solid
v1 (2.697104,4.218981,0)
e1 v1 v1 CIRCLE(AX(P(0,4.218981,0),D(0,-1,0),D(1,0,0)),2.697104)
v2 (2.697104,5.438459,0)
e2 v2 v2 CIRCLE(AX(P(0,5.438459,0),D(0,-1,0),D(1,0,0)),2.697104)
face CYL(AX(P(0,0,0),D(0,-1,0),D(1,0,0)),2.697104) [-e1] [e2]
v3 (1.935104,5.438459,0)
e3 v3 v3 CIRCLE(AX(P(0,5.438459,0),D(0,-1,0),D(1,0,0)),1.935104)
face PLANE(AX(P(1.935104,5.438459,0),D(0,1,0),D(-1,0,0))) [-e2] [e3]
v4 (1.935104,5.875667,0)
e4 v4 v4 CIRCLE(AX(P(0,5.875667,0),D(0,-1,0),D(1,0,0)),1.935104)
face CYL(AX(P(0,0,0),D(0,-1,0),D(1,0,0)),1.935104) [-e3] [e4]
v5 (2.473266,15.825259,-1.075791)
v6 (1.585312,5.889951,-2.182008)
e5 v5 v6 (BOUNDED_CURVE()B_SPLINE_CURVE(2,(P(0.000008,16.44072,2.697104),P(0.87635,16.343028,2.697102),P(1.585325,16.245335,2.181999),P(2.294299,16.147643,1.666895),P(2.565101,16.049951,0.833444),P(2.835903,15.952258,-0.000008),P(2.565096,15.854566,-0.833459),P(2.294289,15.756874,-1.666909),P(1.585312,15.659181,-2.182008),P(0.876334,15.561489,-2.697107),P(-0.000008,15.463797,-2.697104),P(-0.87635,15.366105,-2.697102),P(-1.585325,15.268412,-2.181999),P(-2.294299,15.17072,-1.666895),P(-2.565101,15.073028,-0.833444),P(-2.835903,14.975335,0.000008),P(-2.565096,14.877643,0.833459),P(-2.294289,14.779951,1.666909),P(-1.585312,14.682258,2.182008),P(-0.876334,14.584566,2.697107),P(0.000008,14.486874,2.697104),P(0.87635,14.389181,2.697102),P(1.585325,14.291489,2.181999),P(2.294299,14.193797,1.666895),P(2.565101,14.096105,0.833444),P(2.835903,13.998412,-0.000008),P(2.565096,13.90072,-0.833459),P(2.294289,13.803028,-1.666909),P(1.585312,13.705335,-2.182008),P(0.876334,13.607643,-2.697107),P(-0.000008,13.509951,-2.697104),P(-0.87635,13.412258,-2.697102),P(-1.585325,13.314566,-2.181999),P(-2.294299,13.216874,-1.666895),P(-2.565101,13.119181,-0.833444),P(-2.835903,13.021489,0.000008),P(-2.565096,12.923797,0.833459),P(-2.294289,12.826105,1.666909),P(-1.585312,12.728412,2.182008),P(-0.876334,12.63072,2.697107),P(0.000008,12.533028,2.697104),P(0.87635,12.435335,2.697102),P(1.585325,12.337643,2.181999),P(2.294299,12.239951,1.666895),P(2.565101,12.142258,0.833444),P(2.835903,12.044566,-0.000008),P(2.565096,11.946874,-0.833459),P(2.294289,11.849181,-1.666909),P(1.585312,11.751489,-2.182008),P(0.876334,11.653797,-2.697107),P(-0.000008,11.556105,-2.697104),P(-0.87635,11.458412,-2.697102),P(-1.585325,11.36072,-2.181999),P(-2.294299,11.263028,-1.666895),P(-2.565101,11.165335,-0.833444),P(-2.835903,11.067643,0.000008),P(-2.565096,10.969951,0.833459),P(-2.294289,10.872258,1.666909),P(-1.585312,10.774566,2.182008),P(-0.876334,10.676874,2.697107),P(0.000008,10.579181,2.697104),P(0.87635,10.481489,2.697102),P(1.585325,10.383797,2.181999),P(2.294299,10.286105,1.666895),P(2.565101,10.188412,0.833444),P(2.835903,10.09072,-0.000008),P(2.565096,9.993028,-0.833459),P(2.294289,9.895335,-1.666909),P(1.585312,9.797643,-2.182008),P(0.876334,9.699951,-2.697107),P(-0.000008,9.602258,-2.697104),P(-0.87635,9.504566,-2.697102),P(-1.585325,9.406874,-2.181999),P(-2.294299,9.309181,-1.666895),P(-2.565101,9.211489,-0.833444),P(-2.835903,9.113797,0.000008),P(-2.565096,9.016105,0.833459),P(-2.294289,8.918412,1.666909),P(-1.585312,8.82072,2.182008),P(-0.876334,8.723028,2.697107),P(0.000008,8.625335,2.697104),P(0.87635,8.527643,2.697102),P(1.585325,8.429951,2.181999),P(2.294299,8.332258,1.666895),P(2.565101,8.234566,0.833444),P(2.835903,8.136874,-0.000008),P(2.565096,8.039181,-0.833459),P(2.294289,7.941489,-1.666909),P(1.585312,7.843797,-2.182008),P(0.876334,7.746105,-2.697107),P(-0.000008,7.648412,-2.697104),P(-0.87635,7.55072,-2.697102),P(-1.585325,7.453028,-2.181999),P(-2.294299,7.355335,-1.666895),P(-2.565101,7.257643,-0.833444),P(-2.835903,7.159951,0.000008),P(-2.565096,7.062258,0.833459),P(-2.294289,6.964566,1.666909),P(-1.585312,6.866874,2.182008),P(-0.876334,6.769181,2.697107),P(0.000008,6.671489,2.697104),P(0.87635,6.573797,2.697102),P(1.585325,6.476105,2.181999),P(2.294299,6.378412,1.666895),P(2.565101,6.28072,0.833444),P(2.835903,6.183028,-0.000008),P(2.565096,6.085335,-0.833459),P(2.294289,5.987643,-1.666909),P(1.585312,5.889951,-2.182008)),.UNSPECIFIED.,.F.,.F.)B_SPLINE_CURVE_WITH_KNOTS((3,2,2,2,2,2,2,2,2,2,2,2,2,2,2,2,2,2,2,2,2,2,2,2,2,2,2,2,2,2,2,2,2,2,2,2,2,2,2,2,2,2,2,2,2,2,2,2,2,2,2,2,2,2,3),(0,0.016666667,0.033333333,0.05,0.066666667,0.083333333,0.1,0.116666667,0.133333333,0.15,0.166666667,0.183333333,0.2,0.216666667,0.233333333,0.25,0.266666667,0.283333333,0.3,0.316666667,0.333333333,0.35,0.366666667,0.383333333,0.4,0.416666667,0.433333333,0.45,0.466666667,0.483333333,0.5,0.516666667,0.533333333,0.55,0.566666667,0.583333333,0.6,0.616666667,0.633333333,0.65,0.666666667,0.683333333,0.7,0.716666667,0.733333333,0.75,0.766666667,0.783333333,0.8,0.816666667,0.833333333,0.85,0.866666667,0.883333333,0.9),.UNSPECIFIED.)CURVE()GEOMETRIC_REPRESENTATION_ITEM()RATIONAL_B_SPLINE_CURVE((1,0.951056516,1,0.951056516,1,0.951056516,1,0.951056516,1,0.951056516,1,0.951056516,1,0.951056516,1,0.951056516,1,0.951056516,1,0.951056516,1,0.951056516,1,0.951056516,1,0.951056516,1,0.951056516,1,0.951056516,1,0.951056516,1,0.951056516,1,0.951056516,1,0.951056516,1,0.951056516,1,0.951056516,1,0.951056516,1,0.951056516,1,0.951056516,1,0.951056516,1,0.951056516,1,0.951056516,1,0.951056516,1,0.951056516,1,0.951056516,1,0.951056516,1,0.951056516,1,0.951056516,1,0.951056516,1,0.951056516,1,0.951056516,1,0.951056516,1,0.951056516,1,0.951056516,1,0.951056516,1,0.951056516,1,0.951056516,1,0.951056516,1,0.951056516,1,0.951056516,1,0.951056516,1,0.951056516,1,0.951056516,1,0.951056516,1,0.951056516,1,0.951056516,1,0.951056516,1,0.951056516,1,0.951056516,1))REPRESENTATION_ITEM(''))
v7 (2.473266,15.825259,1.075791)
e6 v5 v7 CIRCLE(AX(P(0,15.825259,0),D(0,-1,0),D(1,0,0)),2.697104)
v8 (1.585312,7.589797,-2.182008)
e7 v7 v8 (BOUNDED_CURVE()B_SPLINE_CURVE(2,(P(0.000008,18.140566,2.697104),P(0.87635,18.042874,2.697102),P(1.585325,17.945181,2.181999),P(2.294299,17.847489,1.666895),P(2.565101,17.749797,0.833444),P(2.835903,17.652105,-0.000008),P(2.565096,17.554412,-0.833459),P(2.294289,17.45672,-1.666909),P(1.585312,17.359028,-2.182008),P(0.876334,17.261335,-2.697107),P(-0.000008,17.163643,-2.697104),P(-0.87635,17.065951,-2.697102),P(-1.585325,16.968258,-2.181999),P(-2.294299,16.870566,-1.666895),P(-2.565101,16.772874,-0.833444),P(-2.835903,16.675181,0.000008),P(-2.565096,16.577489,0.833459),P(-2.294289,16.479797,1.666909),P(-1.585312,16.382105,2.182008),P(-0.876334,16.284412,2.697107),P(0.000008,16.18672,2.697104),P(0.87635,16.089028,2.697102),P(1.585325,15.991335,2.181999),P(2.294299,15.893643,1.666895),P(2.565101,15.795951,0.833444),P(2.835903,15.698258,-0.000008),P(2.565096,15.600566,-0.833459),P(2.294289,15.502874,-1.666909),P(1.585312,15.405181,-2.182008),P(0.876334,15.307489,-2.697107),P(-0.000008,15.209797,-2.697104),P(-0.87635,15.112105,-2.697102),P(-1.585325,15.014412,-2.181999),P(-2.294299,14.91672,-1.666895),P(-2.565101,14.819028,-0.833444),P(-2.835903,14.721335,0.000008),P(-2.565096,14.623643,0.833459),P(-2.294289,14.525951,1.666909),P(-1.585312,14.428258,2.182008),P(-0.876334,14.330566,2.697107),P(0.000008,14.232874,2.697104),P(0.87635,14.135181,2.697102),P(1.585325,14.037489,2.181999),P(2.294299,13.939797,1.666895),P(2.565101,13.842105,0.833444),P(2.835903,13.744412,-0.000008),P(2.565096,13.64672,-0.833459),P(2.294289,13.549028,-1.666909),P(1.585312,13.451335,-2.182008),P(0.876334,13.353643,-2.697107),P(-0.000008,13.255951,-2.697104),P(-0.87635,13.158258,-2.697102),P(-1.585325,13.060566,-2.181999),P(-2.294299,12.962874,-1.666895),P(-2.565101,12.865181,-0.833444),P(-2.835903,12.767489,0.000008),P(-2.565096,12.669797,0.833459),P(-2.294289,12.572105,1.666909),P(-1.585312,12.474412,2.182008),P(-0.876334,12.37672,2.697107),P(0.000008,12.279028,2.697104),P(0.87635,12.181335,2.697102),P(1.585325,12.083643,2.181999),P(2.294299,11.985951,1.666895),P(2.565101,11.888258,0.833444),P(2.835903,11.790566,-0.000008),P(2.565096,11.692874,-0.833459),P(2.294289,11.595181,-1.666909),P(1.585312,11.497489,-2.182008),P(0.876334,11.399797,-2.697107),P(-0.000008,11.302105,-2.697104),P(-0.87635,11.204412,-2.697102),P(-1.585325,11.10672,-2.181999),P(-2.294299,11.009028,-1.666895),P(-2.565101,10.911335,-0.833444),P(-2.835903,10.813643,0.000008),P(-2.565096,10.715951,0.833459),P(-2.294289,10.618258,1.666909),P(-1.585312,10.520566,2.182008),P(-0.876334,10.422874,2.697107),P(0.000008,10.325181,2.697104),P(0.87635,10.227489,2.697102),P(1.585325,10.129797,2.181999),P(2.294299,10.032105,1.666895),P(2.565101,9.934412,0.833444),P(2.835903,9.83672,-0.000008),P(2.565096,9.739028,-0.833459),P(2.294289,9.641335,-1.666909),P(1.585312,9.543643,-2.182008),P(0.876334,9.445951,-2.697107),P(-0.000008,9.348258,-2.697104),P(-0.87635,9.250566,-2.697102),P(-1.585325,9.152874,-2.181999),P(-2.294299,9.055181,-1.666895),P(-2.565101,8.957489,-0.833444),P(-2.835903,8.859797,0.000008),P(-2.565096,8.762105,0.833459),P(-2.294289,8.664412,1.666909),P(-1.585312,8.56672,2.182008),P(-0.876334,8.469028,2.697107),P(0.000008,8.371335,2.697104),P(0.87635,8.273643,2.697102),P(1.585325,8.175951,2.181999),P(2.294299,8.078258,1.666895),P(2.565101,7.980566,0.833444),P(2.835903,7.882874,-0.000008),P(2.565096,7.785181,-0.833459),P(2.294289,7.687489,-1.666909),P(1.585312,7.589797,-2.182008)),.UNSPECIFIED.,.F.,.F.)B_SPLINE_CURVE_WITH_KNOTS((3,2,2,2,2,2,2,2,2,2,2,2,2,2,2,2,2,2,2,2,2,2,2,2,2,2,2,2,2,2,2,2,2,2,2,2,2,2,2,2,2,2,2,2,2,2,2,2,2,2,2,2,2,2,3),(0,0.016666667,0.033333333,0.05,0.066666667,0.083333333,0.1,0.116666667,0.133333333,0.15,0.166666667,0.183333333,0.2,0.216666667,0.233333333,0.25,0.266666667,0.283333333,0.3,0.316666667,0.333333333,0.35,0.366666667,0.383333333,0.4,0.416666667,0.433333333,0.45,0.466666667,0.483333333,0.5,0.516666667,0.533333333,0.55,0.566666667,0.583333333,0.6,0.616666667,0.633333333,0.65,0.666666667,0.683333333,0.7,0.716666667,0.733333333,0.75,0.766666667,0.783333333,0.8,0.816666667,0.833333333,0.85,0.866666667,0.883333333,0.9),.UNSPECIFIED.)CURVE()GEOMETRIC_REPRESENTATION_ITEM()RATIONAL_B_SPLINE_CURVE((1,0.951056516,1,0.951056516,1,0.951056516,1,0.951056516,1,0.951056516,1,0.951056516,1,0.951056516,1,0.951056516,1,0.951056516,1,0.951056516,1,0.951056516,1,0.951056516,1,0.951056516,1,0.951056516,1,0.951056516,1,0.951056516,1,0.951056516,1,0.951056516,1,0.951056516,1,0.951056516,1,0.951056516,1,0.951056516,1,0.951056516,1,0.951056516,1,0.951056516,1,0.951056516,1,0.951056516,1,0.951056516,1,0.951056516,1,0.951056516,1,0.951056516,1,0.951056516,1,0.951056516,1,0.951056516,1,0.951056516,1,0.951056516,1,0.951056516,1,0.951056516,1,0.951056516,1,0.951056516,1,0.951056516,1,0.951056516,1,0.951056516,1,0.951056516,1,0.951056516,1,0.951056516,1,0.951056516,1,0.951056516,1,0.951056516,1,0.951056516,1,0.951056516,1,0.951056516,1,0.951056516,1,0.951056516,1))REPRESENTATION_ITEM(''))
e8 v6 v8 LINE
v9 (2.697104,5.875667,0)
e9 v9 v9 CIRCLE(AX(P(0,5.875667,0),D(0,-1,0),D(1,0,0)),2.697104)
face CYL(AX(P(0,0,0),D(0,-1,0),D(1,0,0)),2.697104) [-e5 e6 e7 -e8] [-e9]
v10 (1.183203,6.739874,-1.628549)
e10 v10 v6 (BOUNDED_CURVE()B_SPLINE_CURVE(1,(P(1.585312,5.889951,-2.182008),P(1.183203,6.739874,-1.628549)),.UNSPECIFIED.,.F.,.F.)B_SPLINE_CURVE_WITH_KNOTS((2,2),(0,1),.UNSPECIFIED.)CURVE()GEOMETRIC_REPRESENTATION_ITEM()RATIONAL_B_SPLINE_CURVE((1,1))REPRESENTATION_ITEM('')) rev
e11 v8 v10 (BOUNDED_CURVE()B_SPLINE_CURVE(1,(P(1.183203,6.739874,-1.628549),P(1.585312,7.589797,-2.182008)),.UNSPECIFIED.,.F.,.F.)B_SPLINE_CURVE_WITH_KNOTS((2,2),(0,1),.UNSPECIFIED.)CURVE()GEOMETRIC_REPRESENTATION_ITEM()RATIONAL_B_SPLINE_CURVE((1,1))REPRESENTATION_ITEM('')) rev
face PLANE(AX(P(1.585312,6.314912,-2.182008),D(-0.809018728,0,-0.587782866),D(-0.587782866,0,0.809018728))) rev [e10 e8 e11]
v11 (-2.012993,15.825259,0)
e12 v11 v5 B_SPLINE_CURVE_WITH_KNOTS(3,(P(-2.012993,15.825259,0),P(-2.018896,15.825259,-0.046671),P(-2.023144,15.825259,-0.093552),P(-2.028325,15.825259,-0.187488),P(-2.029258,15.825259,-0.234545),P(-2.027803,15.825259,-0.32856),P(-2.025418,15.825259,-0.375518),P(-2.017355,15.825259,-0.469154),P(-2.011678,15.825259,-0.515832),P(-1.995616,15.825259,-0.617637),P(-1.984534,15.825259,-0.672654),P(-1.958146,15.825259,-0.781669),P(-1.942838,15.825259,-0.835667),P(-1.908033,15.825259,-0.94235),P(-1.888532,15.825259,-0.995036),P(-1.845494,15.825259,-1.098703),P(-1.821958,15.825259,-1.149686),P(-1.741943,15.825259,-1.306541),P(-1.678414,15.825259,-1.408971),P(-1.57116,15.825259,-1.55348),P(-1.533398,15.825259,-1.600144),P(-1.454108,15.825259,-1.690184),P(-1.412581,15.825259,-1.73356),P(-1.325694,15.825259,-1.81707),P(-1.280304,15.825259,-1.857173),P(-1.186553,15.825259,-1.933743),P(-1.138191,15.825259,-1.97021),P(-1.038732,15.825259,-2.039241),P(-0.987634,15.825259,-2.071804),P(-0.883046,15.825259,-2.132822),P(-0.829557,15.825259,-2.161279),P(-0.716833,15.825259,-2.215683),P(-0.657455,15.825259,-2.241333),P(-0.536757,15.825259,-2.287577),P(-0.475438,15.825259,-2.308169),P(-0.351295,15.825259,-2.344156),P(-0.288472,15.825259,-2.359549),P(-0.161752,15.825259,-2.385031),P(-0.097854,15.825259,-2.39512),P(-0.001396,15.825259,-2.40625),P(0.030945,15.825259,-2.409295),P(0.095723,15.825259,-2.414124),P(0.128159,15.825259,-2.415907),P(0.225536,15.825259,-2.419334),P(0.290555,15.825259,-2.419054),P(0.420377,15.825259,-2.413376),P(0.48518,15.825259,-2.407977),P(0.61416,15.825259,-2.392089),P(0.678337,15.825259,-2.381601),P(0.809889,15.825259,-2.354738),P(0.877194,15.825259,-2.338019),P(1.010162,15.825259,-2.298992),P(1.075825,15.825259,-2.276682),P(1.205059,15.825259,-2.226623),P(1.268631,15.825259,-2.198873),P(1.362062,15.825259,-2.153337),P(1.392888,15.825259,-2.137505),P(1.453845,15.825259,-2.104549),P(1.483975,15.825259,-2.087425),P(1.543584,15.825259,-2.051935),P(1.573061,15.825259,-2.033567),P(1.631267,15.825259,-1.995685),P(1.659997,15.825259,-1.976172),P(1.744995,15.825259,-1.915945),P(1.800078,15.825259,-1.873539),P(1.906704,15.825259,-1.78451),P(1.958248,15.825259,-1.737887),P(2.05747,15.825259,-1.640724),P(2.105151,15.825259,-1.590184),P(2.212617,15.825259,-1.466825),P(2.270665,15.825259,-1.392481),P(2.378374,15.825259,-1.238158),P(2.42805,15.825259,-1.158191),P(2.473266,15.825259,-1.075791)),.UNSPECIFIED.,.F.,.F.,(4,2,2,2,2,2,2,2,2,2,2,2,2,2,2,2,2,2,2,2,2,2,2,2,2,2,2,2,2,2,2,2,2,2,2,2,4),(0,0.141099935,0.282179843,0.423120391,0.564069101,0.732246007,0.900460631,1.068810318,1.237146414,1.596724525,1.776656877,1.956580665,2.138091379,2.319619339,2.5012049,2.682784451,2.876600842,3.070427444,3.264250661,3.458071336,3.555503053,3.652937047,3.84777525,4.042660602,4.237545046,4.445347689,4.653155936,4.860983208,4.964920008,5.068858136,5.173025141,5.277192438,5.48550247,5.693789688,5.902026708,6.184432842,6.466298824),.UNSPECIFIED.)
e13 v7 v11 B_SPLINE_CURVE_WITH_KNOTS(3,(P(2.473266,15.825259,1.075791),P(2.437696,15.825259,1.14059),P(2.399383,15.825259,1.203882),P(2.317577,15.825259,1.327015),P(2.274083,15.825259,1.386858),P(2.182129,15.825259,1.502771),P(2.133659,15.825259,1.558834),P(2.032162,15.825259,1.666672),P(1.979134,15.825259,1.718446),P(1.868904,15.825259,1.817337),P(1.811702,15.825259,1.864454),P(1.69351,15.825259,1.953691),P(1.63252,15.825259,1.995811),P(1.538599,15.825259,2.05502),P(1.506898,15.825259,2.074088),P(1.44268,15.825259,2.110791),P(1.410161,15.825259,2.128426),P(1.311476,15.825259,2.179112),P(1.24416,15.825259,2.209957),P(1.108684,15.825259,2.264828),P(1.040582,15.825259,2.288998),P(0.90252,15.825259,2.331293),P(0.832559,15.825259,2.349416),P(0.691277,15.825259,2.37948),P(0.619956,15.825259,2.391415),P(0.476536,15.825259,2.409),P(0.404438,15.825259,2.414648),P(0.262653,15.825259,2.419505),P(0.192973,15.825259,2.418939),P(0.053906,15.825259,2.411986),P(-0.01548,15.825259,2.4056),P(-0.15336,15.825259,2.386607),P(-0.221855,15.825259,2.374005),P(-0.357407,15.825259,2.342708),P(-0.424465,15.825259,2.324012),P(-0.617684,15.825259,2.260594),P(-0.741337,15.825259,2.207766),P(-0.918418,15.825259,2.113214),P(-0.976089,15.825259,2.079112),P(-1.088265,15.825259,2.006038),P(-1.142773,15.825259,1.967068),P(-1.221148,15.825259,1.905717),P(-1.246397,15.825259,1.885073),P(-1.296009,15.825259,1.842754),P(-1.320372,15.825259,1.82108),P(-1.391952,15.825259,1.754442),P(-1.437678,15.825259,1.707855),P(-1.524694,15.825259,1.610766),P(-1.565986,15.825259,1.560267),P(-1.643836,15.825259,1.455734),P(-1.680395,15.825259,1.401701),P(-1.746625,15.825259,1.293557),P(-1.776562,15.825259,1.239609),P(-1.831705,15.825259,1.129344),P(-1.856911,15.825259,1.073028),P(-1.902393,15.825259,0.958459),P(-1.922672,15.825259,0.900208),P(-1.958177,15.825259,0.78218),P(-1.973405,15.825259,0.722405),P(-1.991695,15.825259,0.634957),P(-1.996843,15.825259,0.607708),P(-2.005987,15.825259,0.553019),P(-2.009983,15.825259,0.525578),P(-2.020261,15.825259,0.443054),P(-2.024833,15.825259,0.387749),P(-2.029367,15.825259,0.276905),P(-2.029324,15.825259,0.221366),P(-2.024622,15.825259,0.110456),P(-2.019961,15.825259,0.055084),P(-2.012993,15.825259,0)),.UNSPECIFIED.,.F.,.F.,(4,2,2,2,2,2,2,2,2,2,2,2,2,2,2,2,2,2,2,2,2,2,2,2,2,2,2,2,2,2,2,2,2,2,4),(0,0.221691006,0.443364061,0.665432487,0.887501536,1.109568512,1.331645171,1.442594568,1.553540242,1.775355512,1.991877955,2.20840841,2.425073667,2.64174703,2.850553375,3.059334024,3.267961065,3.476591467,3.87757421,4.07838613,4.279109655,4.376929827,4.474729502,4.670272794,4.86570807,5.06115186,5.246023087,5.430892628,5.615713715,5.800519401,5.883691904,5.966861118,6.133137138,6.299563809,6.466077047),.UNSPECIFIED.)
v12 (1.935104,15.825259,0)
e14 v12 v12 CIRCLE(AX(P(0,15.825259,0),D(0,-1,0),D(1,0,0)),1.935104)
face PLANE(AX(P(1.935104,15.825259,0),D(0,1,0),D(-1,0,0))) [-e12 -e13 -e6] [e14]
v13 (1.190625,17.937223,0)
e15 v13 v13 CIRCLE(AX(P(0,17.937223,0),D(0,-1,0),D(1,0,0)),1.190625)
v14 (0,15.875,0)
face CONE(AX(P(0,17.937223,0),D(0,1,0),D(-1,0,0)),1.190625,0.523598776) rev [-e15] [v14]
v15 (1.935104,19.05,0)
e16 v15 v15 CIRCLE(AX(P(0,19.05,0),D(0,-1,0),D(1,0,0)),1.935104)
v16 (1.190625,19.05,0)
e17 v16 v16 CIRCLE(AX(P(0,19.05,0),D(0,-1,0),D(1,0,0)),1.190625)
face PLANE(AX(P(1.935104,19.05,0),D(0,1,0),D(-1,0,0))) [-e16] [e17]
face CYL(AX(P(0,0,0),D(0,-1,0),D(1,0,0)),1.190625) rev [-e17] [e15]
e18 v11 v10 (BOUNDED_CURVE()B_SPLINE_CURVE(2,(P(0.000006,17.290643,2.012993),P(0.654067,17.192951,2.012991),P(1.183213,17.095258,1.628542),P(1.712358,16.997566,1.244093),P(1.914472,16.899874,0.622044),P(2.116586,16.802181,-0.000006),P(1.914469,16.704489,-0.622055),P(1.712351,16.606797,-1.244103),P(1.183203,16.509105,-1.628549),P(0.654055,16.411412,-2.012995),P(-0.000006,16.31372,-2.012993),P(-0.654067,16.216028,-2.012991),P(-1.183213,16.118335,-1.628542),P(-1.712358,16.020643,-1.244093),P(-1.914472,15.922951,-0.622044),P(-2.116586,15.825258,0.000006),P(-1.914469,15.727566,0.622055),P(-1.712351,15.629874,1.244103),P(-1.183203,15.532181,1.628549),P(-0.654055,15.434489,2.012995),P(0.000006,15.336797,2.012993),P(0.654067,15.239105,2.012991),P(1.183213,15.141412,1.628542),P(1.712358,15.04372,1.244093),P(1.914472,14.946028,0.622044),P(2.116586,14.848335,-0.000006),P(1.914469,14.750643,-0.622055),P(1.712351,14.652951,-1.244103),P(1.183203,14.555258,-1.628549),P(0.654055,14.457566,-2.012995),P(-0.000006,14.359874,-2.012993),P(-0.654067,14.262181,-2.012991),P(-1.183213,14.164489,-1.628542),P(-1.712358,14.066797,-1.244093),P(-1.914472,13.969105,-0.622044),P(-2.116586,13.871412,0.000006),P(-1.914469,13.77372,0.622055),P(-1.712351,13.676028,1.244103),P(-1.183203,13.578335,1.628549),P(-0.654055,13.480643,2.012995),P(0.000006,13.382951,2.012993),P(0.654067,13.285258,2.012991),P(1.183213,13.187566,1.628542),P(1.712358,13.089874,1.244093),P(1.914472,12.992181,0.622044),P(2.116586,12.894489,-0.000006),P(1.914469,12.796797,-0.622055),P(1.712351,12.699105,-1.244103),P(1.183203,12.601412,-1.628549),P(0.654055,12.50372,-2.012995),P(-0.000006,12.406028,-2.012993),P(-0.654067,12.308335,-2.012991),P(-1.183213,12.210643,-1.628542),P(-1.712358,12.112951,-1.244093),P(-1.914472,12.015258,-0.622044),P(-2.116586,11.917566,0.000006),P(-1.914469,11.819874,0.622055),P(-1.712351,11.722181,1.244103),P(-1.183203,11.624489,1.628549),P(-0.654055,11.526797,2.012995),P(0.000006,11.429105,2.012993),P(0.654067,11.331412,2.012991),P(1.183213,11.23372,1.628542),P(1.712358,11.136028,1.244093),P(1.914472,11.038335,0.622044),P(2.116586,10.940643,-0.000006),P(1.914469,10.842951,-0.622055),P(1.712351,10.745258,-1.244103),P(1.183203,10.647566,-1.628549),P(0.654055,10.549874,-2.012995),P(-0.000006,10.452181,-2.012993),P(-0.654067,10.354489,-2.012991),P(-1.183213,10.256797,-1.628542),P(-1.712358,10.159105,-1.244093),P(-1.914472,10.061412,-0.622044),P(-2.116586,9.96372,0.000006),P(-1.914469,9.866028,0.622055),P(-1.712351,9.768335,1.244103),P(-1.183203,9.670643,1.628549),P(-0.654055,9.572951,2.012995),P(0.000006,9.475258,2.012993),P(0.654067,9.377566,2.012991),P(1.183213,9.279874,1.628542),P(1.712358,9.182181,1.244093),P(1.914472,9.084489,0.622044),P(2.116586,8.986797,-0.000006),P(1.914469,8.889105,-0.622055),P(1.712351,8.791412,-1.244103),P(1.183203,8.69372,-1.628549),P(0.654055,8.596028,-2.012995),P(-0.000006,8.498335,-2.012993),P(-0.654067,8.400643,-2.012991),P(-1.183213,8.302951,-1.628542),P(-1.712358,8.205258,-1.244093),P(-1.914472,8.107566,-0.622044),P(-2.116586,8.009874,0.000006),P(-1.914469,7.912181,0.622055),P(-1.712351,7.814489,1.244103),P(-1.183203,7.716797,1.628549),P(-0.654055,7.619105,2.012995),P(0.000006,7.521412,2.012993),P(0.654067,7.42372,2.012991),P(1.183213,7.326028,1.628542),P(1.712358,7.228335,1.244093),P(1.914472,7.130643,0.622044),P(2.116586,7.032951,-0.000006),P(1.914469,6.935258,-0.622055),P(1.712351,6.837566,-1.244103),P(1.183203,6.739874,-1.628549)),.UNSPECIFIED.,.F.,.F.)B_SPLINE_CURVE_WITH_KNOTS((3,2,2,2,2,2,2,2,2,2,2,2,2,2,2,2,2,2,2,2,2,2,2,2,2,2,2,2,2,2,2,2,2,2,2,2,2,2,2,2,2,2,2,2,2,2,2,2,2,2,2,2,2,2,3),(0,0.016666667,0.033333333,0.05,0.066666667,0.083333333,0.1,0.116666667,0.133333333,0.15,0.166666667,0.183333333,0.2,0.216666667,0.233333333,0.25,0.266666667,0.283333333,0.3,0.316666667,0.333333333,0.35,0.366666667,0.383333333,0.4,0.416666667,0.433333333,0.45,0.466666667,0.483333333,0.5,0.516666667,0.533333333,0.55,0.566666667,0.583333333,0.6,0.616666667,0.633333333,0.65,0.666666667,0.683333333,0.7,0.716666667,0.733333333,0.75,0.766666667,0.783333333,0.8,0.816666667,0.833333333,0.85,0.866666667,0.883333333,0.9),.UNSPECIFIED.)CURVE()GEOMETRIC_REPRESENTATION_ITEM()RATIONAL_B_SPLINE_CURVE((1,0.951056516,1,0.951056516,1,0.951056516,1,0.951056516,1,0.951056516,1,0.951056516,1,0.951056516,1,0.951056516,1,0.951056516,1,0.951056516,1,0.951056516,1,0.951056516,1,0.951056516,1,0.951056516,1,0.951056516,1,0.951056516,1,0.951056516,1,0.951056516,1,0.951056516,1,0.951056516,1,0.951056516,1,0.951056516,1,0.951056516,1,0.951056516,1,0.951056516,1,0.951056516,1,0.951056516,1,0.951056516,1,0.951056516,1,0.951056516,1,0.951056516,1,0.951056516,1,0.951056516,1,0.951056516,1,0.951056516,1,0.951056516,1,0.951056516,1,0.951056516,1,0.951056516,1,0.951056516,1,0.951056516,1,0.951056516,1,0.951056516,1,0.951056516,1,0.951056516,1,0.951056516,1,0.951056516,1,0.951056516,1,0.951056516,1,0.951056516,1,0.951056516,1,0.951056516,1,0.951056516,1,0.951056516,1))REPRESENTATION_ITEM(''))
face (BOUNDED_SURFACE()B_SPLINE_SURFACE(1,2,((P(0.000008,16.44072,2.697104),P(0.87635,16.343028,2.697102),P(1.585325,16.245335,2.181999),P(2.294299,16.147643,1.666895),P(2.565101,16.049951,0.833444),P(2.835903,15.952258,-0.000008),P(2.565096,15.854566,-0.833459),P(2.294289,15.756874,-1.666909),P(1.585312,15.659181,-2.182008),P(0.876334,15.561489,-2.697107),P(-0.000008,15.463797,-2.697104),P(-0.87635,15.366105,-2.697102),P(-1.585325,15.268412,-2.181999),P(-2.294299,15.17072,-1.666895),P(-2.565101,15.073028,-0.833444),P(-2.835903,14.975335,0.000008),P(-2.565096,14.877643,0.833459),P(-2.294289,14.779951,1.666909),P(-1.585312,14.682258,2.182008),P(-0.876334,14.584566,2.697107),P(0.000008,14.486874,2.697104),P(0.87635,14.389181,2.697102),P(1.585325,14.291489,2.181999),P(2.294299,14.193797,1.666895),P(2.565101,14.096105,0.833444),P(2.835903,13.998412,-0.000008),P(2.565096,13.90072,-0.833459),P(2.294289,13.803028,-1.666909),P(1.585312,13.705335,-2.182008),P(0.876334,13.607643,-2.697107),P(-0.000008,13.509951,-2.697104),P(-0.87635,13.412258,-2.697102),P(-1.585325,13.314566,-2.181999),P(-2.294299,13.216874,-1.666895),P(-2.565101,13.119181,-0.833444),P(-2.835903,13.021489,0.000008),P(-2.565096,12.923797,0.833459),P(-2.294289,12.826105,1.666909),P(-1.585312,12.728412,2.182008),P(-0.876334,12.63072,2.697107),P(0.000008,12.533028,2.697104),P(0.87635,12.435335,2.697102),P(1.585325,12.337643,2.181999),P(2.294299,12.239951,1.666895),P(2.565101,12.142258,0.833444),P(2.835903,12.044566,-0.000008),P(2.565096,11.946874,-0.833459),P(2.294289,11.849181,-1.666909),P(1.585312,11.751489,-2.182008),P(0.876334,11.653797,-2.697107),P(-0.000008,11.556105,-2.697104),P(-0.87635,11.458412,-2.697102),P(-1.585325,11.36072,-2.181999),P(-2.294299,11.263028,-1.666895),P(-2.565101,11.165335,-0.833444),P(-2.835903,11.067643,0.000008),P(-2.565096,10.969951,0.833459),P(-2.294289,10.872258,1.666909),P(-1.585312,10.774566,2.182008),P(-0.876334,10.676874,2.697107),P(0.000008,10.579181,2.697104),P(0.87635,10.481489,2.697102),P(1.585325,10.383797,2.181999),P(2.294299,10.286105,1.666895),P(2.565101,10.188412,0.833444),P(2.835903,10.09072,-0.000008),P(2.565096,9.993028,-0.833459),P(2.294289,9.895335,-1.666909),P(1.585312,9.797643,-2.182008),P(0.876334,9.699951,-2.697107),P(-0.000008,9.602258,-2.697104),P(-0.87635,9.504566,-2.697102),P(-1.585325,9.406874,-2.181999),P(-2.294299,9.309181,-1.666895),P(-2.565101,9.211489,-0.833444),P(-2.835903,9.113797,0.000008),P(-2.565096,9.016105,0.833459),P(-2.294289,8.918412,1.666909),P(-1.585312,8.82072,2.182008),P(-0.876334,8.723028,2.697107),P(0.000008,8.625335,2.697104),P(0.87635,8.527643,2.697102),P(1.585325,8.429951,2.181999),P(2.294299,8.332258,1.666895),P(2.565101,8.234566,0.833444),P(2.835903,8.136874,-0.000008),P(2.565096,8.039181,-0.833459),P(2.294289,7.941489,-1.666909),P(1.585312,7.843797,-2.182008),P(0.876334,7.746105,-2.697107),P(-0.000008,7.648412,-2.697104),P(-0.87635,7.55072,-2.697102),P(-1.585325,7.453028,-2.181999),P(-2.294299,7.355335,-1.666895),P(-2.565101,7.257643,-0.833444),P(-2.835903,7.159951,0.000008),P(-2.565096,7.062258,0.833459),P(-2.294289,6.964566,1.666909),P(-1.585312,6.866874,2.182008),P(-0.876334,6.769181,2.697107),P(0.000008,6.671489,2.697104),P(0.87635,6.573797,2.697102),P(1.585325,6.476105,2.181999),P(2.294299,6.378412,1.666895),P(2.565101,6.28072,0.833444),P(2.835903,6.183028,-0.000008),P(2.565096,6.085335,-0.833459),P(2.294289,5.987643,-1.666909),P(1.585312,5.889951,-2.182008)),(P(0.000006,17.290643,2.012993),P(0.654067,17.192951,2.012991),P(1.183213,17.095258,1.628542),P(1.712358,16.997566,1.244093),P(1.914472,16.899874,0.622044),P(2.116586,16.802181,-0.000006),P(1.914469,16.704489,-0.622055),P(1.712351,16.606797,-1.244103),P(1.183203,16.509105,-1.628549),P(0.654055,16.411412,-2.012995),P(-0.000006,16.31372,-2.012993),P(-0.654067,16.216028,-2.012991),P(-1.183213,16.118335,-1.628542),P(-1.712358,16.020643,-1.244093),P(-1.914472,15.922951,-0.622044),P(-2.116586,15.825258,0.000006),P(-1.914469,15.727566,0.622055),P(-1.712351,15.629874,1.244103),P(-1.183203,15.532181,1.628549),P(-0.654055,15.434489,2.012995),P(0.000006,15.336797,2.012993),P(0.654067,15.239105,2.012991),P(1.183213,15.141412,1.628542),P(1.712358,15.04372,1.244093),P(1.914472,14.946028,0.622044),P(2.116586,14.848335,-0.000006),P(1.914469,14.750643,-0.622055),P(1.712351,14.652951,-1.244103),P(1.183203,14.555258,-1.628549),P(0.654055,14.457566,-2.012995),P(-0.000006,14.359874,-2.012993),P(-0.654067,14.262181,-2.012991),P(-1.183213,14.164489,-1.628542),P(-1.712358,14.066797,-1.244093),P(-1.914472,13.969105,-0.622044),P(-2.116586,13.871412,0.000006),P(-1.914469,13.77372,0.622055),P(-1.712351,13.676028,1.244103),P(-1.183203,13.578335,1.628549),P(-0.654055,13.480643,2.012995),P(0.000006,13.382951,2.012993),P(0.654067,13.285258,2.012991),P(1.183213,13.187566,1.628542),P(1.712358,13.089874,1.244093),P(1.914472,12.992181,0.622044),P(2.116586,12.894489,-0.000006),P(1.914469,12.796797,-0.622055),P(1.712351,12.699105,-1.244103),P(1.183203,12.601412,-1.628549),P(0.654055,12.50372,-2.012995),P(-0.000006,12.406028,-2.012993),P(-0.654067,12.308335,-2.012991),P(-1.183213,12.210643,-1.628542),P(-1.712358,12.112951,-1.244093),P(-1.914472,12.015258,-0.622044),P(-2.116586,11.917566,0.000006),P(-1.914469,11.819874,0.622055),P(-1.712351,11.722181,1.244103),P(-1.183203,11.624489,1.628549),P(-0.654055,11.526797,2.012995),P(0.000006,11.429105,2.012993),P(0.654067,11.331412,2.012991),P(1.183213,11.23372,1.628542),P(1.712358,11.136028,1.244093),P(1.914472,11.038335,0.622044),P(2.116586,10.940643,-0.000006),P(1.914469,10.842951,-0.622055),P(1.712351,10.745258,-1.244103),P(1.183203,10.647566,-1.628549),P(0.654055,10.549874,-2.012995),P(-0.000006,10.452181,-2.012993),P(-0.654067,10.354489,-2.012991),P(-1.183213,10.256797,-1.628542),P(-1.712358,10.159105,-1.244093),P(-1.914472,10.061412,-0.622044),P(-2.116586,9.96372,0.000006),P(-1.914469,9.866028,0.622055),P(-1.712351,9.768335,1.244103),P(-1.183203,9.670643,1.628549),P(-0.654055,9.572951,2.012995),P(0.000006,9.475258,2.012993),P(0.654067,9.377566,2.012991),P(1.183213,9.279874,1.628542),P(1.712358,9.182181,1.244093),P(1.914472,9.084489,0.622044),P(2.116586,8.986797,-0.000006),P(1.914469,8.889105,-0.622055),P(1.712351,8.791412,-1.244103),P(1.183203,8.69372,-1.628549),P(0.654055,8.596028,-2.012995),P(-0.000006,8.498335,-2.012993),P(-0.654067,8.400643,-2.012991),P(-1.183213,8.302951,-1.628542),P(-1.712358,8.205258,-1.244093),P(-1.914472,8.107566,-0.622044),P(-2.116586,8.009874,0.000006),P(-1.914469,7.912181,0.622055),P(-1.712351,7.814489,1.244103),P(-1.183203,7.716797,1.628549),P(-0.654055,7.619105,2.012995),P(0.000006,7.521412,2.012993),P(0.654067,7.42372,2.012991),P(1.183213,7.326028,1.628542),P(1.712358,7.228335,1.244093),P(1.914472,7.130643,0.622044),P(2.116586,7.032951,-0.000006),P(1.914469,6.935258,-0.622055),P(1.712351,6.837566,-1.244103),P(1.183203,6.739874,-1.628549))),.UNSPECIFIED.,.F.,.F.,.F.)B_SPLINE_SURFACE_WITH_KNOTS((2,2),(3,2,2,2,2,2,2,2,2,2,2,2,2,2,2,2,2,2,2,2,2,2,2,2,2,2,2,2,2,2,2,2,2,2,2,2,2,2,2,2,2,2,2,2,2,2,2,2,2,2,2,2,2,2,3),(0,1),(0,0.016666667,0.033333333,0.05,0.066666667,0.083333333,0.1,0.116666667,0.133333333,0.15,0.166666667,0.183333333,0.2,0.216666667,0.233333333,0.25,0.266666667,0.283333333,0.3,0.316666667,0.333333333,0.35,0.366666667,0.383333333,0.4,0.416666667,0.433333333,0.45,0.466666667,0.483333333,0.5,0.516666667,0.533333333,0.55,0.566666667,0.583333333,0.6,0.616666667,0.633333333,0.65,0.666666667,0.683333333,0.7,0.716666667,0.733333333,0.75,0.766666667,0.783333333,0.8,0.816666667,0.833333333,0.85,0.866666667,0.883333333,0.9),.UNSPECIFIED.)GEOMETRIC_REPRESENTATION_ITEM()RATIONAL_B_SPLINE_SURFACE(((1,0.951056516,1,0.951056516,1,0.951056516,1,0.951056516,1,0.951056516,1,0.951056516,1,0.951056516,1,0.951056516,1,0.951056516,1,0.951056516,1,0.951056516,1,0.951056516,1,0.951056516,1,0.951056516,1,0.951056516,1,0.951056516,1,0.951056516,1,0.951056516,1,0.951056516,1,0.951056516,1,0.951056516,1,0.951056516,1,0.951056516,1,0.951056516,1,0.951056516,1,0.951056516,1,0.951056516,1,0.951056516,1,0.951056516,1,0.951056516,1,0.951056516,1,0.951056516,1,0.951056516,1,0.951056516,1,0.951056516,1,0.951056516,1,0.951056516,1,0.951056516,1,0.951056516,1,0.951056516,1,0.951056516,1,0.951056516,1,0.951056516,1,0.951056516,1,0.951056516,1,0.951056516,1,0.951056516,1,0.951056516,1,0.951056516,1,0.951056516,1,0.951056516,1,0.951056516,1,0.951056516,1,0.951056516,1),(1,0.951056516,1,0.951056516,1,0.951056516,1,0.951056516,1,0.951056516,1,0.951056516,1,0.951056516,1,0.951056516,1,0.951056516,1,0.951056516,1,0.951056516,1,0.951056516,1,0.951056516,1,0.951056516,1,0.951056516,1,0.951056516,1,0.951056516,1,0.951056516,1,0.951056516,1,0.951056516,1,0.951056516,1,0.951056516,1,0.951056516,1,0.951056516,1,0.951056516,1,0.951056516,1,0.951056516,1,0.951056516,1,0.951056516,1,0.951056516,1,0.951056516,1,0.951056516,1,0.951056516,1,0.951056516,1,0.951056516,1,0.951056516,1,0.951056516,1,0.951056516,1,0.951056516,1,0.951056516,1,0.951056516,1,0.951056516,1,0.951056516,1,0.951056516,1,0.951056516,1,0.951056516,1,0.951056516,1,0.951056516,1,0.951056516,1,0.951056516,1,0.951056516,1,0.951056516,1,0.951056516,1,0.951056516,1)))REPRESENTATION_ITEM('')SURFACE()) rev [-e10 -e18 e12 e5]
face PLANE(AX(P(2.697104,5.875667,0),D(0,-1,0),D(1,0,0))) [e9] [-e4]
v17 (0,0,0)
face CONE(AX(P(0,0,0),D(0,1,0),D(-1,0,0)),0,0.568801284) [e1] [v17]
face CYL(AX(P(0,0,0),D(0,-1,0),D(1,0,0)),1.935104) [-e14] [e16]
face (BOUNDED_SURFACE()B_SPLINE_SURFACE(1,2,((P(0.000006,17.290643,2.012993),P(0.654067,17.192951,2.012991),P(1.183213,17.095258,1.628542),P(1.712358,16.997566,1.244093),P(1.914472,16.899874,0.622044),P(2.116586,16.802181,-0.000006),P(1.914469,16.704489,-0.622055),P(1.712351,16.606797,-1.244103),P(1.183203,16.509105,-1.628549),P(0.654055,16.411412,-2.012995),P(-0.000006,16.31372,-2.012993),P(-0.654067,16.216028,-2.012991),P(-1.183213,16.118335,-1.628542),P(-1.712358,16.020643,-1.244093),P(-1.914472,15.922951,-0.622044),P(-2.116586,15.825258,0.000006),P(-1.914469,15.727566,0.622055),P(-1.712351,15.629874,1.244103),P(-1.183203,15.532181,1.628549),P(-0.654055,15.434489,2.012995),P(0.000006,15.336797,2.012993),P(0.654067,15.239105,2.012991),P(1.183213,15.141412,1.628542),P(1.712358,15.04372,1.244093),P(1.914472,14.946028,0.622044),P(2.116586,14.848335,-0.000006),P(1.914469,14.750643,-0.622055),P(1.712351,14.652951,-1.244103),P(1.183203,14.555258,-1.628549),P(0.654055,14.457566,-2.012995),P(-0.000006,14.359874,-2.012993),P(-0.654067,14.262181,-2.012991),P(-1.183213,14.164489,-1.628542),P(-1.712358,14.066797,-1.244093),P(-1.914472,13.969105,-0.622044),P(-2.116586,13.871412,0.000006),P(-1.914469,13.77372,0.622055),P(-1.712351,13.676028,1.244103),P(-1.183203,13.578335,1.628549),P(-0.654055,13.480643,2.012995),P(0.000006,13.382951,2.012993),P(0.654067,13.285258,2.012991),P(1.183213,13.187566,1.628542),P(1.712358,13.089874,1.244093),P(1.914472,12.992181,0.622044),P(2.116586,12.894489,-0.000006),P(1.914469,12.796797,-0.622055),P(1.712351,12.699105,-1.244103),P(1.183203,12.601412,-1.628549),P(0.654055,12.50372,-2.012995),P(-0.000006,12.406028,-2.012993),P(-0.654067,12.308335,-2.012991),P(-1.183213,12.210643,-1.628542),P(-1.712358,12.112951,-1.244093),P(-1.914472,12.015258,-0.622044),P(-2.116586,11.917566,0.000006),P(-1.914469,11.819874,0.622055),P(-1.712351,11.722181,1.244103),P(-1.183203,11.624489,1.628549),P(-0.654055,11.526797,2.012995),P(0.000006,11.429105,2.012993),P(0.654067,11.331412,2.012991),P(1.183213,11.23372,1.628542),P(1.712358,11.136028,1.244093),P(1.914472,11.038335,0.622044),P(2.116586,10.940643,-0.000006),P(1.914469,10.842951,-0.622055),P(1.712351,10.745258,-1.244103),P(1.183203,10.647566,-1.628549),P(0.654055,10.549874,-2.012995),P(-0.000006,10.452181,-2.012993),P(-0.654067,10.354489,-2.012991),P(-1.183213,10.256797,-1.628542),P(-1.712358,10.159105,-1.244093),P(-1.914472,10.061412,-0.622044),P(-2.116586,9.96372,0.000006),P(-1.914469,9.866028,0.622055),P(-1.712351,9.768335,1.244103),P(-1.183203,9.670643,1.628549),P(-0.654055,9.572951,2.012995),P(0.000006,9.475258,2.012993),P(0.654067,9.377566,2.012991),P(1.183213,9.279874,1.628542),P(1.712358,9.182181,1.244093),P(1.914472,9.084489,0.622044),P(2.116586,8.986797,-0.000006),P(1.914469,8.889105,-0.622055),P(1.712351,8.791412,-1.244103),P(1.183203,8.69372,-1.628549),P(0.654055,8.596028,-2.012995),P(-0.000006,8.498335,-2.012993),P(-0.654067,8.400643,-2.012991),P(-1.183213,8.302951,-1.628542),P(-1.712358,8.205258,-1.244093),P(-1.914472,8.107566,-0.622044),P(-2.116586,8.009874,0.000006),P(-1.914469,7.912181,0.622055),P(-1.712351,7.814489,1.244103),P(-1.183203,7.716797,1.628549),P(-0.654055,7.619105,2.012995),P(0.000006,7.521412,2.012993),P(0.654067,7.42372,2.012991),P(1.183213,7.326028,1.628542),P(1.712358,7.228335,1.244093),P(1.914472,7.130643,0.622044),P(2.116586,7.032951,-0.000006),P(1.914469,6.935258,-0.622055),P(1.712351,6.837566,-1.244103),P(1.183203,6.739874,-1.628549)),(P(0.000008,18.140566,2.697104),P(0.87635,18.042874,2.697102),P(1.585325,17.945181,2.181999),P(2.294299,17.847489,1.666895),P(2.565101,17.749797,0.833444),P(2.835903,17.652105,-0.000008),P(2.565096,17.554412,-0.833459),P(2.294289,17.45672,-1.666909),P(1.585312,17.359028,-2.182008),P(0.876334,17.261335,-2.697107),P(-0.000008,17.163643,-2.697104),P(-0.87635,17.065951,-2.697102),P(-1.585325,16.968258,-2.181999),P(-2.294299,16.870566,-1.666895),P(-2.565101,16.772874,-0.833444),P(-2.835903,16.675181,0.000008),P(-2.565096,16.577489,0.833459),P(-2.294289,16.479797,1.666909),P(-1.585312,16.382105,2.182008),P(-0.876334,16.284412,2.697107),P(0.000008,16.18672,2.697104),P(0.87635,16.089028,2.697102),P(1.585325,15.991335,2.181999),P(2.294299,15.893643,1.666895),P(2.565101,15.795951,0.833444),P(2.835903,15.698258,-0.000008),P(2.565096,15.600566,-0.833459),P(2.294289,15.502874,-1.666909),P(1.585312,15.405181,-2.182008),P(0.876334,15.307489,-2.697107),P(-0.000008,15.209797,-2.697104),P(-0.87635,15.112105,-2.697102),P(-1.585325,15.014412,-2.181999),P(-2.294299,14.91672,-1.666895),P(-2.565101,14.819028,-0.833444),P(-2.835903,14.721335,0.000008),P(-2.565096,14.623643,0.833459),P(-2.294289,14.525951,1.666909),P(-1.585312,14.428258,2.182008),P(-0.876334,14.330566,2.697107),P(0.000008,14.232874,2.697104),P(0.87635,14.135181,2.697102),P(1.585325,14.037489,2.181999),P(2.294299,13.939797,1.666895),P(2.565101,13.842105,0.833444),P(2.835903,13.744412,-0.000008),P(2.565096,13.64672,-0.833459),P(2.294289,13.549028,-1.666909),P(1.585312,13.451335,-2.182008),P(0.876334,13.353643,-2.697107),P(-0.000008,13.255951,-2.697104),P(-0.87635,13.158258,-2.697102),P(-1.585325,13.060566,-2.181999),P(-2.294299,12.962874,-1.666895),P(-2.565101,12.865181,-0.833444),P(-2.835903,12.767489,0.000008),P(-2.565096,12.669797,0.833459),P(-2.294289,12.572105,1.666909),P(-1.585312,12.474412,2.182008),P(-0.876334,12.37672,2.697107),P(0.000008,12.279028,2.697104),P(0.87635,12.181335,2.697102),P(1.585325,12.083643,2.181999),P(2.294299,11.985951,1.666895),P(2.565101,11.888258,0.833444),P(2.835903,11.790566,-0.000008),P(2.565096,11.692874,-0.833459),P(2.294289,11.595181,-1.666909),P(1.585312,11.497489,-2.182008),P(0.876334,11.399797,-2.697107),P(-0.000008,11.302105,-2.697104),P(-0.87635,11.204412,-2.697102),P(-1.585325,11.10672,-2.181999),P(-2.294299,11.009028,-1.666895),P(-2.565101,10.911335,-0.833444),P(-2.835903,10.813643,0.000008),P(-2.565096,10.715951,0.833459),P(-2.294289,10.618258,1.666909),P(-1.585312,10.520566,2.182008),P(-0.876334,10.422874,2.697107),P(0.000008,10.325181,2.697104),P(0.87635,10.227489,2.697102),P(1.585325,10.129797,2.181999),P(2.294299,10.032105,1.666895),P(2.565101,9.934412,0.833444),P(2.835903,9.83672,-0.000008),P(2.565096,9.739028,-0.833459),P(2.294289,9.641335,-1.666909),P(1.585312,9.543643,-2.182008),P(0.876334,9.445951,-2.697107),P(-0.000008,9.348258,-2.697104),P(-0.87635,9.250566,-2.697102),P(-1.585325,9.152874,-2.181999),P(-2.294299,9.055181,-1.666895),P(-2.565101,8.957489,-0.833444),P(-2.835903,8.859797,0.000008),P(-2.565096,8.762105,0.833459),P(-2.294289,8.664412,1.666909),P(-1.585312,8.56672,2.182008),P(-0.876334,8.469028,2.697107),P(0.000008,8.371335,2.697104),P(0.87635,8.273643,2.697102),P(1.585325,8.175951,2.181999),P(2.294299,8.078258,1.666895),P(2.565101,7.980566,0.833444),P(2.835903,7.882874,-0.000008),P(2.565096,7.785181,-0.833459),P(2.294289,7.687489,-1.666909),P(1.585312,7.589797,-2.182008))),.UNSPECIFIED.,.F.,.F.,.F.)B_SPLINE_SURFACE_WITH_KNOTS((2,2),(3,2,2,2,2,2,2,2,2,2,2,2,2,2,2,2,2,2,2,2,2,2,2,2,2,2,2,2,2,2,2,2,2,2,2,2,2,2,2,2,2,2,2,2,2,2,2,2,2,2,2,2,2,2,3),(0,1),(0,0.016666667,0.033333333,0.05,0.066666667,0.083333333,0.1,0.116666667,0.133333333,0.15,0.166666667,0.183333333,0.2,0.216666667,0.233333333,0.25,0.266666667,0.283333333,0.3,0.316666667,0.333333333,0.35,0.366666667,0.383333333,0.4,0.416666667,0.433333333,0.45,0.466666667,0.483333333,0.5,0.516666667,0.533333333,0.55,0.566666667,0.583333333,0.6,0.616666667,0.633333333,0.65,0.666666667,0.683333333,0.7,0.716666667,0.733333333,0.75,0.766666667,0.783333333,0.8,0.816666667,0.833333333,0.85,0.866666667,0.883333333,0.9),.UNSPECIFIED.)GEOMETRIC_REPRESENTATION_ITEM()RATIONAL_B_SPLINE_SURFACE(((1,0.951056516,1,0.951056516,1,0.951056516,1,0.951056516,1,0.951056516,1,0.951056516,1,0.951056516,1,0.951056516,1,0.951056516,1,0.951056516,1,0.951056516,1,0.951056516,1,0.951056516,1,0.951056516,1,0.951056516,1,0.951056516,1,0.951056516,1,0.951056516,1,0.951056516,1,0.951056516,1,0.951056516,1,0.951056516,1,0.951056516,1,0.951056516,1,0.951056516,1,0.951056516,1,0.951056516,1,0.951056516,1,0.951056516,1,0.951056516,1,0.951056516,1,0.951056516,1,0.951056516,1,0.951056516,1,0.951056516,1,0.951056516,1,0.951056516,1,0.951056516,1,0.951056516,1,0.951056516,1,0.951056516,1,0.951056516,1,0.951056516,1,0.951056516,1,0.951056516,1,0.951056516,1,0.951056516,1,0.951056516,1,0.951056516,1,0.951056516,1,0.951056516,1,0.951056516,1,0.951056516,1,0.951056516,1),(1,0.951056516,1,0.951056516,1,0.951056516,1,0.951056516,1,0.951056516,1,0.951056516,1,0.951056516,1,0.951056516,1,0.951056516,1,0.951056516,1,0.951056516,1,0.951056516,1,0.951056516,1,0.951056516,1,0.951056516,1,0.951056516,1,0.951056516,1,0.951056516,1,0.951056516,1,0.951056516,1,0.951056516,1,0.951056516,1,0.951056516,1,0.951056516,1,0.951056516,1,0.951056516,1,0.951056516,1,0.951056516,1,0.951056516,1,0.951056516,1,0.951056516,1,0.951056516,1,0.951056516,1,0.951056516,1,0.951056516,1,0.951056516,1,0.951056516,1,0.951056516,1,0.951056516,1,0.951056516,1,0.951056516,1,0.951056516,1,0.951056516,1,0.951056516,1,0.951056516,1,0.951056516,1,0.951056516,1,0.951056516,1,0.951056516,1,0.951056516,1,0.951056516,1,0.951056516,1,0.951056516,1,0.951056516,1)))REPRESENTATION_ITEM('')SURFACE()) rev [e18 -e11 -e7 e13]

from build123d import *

# Parameters (mm, degrees)
CUT_SWEEP9_PITCH = 1.953846154


with BuildPart() as part:
    # Sketch1 → Revolve1 (revolve)
    with BuildSketch(Plane.XY):
        Polygon((0, 0), (2.697104334, 4.218980763), (2.697104334, 5.438459147), (1.935104334, 5.438459147), (1.935104334, 5.875667474), (2.697104334, 5.875667474), (2.697104334, 15.825259324), (1.935104334, 15.825259324), (1.935104334, 19.05), (1.190625, 19.05), (1.190625, 17.937222993), (0, 15.875), align=None)
    revolve(axis=Axis((0, 0, 0), (0, 1, 0)))

    # Cut-Sweep9: arcs per turn and ends read off the stored shape
    # Cut-Sweep9: the profile of Sketch4 profile screwed along a left-hand helix through 5.4 turns, 10 arcs to a turn; built about Z, then put on its axis
    cut_sweep9_z = Axis((0, 0, 0), (0, 0, 1))
    cut_sweep9_corners = [(2.012993376, -5.973e-06, -1.465383693), (2.697404334, -8.003e-06, -0.615087903), (2.697404334, -8.003e-06, -2.315679482)]
    with BuildLine(mode=Mode.PRIVATE) as cut_sweep9_profile:
        Line(cut_sweep9_corners[0], cut_sweep9_corners[1])
        Line(cut_sweep9_corners[1], cut_sweep9_corners[2])
        Line(cut_sweep9_corners[2], cut_sweep9_corners[0])
    cut_sweep9_cap = Face(cut_sweep9_profile.wire())
    cut_sweep9_turn_angles = [0, -18, -36, -54, -72, -90, -108, -126, -144, -162, -180, -198, -216, -234, -252, -270, -288, -306, -324, -342, -360]
    cut_sweep9_turn_weights = [1, 0.9510565162951535, 1, 0.9510565162951535, 1, 0.9510565162951535, 1, 0.9510565162951535, 1, 0.9510565162951535, 1, 0.9510565162951535, 1, 0.9510565162951535, 1, 0.9510565162951535, 1, 0.9510565162951535, 1, 0.9510565162951535, 1]
    cut_sweep9_turn_rails = [Edge.make_bspline([Vector(p[0], p[1], 0).rotate(cut_sweep9_z, cut_sweep9_turn_angles[k]) / cut_sweep9_turn_weights[k] + Vector(0, 0, p[2] + -CUT_SWEEP9_PITCH * cut_sweep9_turn_angles[k] / 360) for k in range(21)], [0, 0, 0, 1, 1, 2, 2, 3, 3, 4, 4, 5, 5, 6, 6, 7, 7, 8, 8, 9, 9, 10, 10, 10], 2, cut_sweep9_turn_weights) for p in cut_sweep9_corners]
    cut_sweep9_turn_sides = [Face.make_surface_from_curves(cut_sweep9_turn_rails[p[0]], cut_sweep9_turn_rails[p[1]]) for p in [(0, 1), (1, 2), (2, 0)]]
    cut_sweep9_last_angles = [-1800, -1818, -1836, -1854, -1872, -1890, -1908, -1926, -1944]
    cut_sweep9_last_weights = [1, 0.9510565162951535, 1, 0.9510565162951535, 1, 0.9510565162951535, 1, 0.9510565162951382, 1]
    cut_sweep9_last_rails = [Edge.make_bspline([Vector(p[0], p[1], 0).rotate(cut_sweep9_z, cut_sweep9_last_angles[k]) / cut_sweep9_last_weights[k] + Vector(0, 0, p[2] + -CUT_SWEEP9_PITCH * cut_sweep9_last_angles[k] / 360) for k in range(9)], [0, 0, 0, 1, 1, 2, 2, 3, 3, 4, 4, 4], 2, cut_sweep9_last_weights) for p in cut_sweep9_corners]
    cut_sweep9_last_sides = [Face.make_surface_from_curves(cut_sweep9_last_rails[p[0]], cut_sweep9_last_rails[p[1]]) for p in [(0, 1), (1, 2), (2, 0)]]
    cut_sweep9 = Plane(origin=(0, 15.825259324, 0), x_dir=(0, 0, 1), z_dir=(0, -1, 0)) * Solid(Shell([*[p.moved(Location((0, 0, CUT_SWEEP9_PITCH * i))) for i in range(5) for p in cut_sweep9_turn_sides], *cut_sweep9_last_sides, cut_sweep9_cap, cut_sweep9_cap.rotate(cut_sweep9_z, -1944).moved(Location((0, 0, -CUT_SWEEP9_PITCH * -1944 / 360)))]))
    add(cut_sweep9, mode=Mode.SUBTRACT)


solid = part.part
